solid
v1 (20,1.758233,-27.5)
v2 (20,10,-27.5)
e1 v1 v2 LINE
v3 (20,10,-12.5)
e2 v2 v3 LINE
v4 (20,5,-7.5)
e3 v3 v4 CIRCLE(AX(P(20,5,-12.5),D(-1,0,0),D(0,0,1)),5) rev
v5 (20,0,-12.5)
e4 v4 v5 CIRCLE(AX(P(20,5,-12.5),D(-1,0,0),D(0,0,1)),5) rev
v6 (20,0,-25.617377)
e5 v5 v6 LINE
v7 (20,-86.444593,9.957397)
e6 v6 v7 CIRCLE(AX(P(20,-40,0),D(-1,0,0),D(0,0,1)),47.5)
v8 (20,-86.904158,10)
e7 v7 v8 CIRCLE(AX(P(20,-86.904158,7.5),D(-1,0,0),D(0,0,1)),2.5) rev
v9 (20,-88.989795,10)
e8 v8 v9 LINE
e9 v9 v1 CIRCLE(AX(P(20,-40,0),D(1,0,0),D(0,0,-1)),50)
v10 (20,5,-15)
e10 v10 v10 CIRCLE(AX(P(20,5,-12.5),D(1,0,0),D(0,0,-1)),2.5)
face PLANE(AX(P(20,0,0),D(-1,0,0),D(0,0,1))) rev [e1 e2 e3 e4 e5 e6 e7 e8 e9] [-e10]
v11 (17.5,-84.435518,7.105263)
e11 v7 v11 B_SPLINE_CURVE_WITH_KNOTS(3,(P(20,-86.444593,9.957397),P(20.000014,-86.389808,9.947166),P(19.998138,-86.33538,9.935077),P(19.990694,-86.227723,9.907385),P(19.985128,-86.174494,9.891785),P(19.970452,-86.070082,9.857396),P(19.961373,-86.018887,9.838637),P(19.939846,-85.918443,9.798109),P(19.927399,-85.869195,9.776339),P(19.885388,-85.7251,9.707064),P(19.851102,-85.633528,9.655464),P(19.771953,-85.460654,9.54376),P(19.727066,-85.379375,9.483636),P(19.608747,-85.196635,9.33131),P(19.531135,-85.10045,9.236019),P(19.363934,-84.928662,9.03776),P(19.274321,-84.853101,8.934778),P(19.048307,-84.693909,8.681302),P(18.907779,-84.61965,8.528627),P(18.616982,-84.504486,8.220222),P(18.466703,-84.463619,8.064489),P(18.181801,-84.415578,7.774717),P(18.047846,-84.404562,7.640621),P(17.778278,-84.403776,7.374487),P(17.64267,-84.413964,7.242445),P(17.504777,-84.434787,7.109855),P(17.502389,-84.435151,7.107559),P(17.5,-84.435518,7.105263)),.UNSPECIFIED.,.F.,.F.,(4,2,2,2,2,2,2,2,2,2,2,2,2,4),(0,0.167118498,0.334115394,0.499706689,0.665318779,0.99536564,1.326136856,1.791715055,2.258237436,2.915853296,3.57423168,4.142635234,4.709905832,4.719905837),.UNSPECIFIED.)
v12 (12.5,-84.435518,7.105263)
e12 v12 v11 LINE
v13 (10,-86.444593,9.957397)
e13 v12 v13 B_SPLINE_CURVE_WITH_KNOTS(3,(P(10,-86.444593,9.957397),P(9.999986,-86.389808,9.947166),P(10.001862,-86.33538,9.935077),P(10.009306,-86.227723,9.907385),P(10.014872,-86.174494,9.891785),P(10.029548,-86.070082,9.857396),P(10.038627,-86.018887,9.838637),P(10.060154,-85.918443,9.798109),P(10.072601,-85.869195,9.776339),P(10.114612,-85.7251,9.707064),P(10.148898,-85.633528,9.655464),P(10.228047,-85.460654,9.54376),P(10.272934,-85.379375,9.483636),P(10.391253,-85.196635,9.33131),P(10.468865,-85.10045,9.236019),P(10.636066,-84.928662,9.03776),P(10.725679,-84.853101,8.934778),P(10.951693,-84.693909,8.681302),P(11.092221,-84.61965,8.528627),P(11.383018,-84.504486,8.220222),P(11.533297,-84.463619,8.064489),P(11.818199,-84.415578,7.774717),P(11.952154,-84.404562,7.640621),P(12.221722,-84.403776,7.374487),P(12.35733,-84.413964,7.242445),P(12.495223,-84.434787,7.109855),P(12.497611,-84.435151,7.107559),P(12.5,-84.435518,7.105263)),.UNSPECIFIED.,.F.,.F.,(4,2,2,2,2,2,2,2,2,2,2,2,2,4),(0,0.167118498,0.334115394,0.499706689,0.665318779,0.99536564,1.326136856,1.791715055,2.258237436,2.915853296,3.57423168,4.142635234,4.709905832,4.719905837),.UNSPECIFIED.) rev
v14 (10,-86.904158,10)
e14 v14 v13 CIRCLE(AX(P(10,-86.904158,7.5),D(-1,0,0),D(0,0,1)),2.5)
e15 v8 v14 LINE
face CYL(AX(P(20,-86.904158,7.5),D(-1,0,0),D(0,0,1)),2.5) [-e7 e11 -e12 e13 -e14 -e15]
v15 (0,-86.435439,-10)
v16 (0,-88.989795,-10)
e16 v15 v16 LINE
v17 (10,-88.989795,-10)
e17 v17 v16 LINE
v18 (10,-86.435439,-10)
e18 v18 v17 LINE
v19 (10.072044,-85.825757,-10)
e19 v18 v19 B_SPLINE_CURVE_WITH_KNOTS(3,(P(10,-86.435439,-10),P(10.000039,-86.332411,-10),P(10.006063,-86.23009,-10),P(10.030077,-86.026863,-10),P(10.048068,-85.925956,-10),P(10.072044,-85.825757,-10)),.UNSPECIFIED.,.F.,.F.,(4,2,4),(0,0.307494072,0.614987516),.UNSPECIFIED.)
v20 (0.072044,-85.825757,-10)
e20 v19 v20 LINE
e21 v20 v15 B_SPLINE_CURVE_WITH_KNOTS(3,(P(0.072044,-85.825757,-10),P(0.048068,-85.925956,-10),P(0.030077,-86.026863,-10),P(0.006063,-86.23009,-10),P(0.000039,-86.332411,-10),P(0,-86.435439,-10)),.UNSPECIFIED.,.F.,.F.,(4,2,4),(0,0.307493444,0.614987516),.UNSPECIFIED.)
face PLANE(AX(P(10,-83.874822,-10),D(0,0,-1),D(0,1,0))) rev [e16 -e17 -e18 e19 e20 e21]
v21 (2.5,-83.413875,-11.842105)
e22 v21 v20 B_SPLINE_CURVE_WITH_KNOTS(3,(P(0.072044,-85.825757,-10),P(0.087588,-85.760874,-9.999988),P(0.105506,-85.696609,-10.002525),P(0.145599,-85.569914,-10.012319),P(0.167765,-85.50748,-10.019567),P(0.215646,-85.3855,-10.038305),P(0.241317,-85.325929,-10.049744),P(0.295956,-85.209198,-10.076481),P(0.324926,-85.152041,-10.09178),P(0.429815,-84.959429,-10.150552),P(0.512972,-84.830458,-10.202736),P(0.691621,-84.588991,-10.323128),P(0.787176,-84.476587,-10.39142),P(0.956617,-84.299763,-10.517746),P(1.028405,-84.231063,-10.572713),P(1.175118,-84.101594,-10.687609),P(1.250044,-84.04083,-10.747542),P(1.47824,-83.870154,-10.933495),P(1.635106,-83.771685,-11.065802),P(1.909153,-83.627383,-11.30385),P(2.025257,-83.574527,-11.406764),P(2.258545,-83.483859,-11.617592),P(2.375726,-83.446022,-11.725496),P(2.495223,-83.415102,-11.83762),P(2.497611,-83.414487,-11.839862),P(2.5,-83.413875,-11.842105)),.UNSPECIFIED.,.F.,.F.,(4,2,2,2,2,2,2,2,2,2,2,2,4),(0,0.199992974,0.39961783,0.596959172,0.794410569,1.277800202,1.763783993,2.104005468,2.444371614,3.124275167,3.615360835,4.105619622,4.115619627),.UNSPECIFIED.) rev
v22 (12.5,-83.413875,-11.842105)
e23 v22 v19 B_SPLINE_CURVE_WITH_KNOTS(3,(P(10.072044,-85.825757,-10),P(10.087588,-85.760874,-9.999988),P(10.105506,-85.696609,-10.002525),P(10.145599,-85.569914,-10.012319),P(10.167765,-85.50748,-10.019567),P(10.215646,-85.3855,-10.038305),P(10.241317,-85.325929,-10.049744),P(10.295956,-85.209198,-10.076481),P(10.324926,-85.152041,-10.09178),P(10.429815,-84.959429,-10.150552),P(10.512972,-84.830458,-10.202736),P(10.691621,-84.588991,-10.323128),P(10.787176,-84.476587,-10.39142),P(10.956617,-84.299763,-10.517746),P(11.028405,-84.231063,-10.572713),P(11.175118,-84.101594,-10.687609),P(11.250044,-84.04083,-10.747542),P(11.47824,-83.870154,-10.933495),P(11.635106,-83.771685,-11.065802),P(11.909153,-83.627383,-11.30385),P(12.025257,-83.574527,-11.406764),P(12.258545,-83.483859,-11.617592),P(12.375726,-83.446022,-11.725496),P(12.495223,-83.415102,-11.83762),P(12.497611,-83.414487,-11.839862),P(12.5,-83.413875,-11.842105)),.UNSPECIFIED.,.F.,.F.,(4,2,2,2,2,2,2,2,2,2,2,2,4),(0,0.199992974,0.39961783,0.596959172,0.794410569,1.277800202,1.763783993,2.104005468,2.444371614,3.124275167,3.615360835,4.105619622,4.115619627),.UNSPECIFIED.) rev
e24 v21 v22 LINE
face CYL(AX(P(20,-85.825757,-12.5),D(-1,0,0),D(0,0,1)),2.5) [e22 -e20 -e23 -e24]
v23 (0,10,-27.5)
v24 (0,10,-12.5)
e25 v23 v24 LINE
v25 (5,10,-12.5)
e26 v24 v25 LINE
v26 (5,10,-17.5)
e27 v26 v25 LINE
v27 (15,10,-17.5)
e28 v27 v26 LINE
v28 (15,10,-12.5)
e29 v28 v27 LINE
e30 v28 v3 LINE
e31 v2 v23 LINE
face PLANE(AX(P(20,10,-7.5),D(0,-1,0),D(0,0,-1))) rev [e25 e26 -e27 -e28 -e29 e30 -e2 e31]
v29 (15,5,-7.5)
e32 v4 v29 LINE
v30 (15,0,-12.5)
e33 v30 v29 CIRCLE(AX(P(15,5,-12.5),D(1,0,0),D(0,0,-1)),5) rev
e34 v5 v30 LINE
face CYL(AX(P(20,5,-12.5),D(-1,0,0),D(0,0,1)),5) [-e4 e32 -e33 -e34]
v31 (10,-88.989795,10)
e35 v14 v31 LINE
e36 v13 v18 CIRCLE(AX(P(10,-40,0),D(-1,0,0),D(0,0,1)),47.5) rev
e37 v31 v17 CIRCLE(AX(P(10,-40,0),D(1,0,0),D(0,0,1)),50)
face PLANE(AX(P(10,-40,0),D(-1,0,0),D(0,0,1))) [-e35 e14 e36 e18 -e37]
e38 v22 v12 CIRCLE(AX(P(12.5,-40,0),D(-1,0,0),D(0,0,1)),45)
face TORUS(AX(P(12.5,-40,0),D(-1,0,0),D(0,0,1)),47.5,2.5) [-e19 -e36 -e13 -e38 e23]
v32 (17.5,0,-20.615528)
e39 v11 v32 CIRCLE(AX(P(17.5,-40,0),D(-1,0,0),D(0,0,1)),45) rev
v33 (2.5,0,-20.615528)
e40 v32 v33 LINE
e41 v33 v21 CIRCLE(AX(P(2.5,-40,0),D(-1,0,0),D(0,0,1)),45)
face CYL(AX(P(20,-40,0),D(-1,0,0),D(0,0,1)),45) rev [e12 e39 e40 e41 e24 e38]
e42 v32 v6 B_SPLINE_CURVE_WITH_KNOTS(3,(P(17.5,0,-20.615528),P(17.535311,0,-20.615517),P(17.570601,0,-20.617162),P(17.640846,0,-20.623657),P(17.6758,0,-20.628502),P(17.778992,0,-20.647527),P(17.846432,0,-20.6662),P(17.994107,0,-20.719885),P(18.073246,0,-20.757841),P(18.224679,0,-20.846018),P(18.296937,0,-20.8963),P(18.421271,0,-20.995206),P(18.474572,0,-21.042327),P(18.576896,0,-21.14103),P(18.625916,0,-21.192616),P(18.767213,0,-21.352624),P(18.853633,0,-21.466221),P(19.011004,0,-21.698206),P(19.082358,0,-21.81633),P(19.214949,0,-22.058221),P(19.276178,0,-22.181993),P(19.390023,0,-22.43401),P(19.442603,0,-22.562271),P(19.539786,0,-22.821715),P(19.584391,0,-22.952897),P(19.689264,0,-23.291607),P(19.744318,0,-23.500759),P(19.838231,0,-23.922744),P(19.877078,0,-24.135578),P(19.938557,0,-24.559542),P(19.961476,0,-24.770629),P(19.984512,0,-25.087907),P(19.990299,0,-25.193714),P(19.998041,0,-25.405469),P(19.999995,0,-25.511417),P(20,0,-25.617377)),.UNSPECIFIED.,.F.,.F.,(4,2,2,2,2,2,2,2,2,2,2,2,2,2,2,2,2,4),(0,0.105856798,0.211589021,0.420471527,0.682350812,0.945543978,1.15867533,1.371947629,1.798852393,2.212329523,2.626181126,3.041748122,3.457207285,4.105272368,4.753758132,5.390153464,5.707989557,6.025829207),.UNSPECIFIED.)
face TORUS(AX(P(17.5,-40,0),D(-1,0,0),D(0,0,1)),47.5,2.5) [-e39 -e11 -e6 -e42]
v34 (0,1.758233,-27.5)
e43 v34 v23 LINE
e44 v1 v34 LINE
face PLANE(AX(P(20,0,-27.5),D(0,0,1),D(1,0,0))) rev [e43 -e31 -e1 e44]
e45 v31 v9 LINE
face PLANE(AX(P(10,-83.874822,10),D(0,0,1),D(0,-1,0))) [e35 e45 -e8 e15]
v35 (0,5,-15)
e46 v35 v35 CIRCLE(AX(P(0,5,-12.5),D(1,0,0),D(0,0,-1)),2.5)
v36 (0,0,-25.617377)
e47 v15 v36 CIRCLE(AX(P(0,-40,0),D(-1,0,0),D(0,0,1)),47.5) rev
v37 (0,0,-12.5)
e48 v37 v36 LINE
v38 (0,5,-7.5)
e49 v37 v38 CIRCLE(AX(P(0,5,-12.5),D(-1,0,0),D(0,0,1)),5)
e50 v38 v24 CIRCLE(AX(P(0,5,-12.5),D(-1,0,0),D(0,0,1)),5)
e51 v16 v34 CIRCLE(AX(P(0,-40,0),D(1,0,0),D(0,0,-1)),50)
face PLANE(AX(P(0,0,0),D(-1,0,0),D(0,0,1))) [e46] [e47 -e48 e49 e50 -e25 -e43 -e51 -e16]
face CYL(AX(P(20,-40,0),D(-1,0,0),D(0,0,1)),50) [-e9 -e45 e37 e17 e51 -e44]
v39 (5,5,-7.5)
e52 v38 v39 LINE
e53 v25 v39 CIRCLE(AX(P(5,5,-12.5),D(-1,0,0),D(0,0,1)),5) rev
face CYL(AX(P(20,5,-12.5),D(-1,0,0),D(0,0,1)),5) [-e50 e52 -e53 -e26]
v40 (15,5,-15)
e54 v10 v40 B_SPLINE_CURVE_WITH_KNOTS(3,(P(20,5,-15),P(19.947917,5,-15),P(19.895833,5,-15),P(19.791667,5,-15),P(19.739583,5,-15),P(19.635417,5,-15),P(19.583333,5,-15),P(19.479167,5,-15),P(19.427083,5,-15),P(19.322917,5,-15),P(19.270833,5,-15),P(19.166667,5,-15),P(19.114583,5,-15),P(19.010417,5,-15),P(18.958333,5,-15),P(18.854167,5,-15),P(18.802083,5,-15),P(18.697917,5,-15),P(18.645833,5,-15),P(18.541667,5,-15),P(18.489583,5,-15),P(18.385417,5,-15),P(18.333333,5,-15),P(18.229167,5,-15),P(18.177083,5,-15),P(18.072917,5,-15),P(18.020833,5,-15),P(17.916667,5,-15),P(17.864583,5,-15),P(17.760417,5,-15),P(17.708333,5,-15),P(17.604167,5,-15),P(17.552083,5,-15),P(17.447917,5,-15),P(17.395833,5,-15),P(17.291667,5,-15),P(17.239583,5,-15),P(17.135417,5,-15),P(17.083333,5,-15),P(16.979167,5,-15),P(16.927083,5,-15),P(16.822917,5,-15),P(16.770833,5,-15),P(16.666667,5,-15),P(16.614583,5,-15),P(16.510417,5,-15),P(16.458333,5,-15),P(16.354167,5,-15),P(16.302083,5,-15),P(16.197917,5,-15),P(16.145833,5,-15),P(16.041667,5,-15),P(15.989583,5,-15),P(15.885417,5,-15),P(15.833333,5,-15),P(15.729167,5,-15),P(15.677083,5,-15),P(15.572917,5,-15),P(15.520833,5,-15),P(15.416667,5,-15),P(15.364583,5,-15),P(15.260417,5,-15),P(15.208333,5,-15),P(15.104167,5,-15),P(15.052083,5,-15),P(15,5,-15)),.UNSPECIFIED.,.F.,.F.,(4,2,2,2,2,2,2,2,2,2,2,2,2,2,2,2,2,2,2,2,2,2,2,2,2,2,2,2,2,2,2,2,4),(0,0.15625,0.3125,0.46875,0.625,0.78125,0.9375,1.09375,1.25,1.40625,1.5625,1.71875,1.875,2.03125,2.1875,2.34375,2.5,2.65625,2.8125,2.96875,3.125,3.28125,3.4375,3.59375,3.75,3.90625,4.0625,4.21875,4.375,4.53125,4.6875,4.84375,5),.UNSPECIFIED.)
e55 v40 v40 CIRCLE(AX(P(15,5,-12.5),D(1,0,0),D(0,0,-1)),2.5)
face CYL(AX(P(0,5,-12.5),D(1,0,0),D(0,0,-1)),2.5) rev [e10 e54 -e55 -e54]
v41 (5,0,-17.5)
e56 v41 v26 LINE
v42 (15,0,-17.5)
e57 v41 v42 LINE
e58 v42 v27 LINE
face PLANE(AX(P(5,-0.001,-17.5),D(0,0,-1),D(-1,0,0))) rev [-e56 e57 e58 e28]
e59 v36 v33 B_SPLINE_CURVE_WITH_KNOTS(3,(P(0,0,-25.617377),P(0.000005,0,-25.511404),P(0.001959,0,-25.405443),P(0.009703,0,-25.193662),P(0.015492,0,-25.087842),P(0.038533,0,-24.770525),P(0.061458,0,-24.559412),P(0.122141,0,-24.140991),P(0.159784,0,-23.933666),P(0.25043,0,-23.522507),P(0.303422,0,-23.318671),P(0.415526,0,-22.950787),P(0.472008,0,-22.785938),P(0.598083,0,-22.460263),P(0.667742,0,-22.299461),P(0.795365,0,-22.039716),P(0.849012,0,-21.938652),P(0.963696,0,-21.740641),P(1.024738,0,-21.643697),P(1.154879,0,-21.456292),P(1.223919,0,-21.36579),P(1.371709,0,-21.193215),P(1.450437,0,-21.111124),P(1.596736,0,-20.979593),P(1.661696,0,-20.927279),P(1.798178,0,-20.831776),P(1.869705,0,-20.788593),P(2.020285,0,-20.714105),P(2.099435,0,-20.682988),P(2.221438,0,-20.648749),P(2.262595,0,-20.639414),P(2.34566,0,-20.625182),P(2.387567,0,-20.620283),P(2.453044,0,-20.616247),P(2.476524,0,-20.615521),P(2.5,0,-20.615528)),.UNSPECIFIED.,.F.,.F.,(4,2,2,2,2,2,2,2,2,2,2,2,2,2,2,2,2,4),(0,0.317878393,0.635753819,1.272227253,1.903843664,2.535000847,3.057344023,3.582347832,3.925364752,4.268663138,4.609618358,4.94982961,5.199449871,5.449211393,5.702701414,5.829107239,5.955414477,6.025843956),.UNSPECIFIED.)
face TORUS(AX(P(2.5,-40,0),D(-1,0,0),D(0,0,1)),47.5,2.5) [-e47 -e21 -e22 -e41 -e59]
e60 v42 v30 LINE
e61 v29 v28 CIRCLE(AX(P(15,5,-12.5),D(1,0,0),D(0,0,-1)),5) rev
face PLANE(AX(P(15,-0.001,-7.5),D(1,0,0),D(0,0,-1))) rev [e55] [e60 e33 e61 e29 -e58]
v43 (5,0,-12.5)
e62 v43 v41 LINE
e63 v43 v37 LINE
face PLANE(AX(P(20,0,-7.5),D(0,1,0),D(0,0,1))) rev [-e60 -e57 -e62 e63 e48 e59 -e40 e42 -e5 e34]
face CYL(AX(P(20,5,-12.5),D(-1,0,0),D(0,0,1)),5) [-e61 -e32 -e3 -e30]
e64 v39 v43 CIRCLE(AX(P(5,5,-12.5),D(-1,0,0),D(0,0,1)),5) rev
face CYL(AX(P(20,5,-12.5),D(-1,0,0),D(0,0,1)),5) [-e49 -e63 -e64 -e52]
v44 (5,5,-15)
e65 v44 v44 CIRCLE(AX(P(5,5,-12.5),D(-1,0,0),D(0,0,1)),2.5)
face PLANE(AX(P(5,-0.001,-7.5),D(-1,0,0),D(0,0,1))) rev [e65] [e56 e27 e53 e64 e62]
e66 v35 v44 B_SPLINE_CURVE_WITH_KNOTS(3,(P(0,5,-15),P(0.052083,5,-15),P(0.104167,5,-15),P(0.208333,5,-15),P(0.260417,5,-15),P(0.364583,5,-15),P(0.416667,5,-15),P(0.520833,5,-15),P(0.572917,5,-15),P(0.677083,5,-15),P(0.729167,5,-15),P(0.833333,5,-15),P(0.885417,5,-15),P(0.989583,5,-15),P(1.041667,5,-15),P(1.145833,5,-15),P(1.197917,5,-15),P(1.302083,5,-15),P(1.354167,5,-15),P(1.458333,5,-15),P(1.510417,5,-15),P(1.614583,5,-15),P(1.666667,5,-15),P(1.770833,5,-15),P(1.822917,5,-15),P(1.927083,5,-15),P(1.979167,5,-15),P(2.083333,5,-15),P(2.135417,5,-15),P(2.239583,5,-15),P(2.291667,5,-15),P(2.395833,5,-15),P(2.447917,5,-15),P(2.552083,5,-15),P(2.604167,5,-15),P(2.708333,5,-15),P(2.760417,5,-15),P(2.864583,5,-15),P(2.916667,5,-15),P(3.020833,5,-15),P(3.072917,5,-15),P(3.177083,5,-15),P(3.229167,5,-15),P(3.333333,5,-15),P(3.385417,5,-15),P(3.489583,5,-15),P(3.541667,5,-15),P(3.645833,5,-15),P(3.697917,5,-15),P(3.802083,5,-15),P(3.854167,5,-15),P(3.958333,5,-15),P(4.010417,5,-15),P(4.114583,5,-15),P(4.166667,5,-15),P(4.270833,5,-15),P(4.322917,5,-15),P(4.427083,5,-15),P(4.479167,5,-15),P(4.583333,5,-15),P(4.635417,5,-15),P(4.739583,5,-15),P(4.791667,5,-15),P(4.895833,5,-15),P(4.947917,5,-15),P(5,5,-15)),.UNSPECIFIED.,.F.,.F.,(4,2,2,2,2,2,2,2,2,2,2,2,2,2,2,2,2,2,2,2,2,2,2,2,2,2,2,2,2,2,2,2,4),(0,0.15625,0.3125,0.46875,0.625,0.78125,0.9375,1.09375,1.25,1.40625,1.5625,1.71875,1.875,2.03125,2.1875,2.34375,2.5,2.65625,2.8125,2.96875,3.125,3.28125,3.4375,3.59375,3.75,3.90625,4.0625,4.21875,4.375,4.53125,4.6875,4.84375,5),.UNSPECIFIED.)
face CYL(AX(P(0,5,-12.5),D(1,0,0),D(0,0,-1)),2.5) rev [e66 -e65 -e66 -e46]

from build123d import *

# Parameters (mm, degrees)
SKETCH3_W               = 20
SKETCH3_H               = 10
BOSS_EXTRUDE2_DEPTH     = 20
CUT_EXTRUDE2_REACH      = 37.444
SKETCH4_W               = 10
SKETCH4_H               = 10
CUT_EXTRUDE3_DEPTH      = 33.882366095
CUT_EXTRUDE3_DEPTH_BACK = 33.882366095
SKETCH5_R               = 2.5
BOSS_EXTRUDE3_DEPTH     = 20
BOSS_EXTRUDE4_START     = -10
BOSS_EXTRUDE4_DEPTH     = 10
CUT_EXTRUDE4_DEPTH      = 10
FILLET1_R               = 5
FILLET2_R               = 2.5


with BuildPart() as part:
    # Sketch3 → Boss-Extrude2 (new body)
    with BuildSketch(Plane(origin=(0, 0, 0), x_dir=(0, 0, -1), z_dir=(1, 0, 0))):
        with Locations((17.5, 5)):
            Rectangle(SKETCH3_W, SKETCH3_H)
    extrude(amount=BOSS_EXTRUDE2_DEPTH)

    # Sketch4 → Cut-Extrude2 (cut, up to next)
    with BuildSketch(Plane(origin=(0, 10, 0), x_dir=(1, 0, 0), z_dir=(0, 1, 0)), mode=Mode.PRIVATE) as cut_extrude2_sk1:
        with Locations((10, 12.5)):
            Rectangle(SKETCH4_W, SKETCH4_H)
    cut_extrude2_tool1 = extrude(cut_extrude2_sk1.sketch, amount=-CUT_EXTRUDE2_REACH, mode=Mode.PRIVATE) & part.part
    add(cut_extrude2_tool1.solids().sort_by_distance((10, 10, -12.5))[0], mode=Mode.SUBTRACT)

    # Sketch5 → Cut-Extrude3 (cut, two sides: drawn at the far end of the back side and taken through both)
    with BuildSketch(Plane(origin=(5, 0, 0), x_dir=(0, 0, -1), z_dir=(1, 0, 0)).offset(-CUT_EXTRUDE3_DEPTH_BACK)):
        with Locations((12.5, 5)):
            Circle(SKETCH5_R)
    extrude(amount=CUT_EXTRUDE3_DEPTH + CUT_EXTRUDE3_DEPTH_BACK, mode=Mode.SUBTRACT)

    # Sketch6 → Boss-Extrude3 (add)
    with BuildSketch(Plane(origin=(0, 0, 0), x_dir=(0, 0, -1), z_dir=(1, 0, 0))):
        with BuildLine():
            Line((0, -85), (0, -90))
            ThreePointArc((0, -90), (47.895258826, -54.354239164), (27.5, 1.758232721))
            Line((27.5, 1.758232721), (20.615528128, 0))
            ThreePointArc((20.615528128, 0), (43.732139211, -50.606601718), (0, -85))
        make_face()
    extrude(amount=BOSS_EXTRUDE3_DEPTH)

    # Sketch7 → Boss-Extrude4 (add)
    with BuildSketch(Plane(origin=(20, 0, 0), x_dir=(0, 0, -1), z_dir=(1, 0, 0)).offset(BOSS_EXTRUDE4_START)):
        with BuildLine():
            Line((0, -85), (0, -90))
            ThreePointArc((0, -90), (-5.0254481, -89.74680765), (-10, -88.989794856))
            Line((-10, -88.989794856), (-10, -83.874821937))
            ThreePointArc((-10, -83.874821937), (-5.031551095, -84.717820761), (0, -85))
        make_face()
    extrude(amount=BOSS_EXTRUDE4_DEPTH)

    # Sketch8 → Cut-Extrude4 (cut)
    with BuildSketch(Plane.ZY):
        with BuildLine():
            Line((0, -85), (0, -90))
            ThreePointArc((0, -90), (-5.0254481, -89.74680765), (-10, -88.989794856))
            Line((-10, -88.989794856), (-10, -83.874821937))
            ThreePointArc((-10, -83.874821937), (-5.031551095, -84.717820761), (0, -85))
        make_face()
    extrude(amount=-CUT_EXTRUDE4_DEPTH, mode=Mode.SUBTRACT)

    # Fillet1
    fillet1_edges = [part.edges().sort_by_distance(p)[0] for p in [
        (17.5, 0, -7.5),
        (17.5, 10, -7.5),
        (2.5, 10, -7.5),
        (2.5, 0, -7.5),
    ]]
    fillet(fillet1_edges, radius=FILLET1_R - 0.0001)  # a hair under: the kernel refuses the full size

    # Fillet2
    fillet2_edges = [part.edges().sort_by_distance(p)[0] for p in [
        (20, -55.429880165, -42.271962317),
        (0, -45.650302702, -44.643858249),
        (10, -85, 0),
        (15, -83.874821937, 10),
        (5, -83.874821937, -10),
    ]]
    fillet(fillet2_edges, radius=FILLET2_R)


solid = part.part
